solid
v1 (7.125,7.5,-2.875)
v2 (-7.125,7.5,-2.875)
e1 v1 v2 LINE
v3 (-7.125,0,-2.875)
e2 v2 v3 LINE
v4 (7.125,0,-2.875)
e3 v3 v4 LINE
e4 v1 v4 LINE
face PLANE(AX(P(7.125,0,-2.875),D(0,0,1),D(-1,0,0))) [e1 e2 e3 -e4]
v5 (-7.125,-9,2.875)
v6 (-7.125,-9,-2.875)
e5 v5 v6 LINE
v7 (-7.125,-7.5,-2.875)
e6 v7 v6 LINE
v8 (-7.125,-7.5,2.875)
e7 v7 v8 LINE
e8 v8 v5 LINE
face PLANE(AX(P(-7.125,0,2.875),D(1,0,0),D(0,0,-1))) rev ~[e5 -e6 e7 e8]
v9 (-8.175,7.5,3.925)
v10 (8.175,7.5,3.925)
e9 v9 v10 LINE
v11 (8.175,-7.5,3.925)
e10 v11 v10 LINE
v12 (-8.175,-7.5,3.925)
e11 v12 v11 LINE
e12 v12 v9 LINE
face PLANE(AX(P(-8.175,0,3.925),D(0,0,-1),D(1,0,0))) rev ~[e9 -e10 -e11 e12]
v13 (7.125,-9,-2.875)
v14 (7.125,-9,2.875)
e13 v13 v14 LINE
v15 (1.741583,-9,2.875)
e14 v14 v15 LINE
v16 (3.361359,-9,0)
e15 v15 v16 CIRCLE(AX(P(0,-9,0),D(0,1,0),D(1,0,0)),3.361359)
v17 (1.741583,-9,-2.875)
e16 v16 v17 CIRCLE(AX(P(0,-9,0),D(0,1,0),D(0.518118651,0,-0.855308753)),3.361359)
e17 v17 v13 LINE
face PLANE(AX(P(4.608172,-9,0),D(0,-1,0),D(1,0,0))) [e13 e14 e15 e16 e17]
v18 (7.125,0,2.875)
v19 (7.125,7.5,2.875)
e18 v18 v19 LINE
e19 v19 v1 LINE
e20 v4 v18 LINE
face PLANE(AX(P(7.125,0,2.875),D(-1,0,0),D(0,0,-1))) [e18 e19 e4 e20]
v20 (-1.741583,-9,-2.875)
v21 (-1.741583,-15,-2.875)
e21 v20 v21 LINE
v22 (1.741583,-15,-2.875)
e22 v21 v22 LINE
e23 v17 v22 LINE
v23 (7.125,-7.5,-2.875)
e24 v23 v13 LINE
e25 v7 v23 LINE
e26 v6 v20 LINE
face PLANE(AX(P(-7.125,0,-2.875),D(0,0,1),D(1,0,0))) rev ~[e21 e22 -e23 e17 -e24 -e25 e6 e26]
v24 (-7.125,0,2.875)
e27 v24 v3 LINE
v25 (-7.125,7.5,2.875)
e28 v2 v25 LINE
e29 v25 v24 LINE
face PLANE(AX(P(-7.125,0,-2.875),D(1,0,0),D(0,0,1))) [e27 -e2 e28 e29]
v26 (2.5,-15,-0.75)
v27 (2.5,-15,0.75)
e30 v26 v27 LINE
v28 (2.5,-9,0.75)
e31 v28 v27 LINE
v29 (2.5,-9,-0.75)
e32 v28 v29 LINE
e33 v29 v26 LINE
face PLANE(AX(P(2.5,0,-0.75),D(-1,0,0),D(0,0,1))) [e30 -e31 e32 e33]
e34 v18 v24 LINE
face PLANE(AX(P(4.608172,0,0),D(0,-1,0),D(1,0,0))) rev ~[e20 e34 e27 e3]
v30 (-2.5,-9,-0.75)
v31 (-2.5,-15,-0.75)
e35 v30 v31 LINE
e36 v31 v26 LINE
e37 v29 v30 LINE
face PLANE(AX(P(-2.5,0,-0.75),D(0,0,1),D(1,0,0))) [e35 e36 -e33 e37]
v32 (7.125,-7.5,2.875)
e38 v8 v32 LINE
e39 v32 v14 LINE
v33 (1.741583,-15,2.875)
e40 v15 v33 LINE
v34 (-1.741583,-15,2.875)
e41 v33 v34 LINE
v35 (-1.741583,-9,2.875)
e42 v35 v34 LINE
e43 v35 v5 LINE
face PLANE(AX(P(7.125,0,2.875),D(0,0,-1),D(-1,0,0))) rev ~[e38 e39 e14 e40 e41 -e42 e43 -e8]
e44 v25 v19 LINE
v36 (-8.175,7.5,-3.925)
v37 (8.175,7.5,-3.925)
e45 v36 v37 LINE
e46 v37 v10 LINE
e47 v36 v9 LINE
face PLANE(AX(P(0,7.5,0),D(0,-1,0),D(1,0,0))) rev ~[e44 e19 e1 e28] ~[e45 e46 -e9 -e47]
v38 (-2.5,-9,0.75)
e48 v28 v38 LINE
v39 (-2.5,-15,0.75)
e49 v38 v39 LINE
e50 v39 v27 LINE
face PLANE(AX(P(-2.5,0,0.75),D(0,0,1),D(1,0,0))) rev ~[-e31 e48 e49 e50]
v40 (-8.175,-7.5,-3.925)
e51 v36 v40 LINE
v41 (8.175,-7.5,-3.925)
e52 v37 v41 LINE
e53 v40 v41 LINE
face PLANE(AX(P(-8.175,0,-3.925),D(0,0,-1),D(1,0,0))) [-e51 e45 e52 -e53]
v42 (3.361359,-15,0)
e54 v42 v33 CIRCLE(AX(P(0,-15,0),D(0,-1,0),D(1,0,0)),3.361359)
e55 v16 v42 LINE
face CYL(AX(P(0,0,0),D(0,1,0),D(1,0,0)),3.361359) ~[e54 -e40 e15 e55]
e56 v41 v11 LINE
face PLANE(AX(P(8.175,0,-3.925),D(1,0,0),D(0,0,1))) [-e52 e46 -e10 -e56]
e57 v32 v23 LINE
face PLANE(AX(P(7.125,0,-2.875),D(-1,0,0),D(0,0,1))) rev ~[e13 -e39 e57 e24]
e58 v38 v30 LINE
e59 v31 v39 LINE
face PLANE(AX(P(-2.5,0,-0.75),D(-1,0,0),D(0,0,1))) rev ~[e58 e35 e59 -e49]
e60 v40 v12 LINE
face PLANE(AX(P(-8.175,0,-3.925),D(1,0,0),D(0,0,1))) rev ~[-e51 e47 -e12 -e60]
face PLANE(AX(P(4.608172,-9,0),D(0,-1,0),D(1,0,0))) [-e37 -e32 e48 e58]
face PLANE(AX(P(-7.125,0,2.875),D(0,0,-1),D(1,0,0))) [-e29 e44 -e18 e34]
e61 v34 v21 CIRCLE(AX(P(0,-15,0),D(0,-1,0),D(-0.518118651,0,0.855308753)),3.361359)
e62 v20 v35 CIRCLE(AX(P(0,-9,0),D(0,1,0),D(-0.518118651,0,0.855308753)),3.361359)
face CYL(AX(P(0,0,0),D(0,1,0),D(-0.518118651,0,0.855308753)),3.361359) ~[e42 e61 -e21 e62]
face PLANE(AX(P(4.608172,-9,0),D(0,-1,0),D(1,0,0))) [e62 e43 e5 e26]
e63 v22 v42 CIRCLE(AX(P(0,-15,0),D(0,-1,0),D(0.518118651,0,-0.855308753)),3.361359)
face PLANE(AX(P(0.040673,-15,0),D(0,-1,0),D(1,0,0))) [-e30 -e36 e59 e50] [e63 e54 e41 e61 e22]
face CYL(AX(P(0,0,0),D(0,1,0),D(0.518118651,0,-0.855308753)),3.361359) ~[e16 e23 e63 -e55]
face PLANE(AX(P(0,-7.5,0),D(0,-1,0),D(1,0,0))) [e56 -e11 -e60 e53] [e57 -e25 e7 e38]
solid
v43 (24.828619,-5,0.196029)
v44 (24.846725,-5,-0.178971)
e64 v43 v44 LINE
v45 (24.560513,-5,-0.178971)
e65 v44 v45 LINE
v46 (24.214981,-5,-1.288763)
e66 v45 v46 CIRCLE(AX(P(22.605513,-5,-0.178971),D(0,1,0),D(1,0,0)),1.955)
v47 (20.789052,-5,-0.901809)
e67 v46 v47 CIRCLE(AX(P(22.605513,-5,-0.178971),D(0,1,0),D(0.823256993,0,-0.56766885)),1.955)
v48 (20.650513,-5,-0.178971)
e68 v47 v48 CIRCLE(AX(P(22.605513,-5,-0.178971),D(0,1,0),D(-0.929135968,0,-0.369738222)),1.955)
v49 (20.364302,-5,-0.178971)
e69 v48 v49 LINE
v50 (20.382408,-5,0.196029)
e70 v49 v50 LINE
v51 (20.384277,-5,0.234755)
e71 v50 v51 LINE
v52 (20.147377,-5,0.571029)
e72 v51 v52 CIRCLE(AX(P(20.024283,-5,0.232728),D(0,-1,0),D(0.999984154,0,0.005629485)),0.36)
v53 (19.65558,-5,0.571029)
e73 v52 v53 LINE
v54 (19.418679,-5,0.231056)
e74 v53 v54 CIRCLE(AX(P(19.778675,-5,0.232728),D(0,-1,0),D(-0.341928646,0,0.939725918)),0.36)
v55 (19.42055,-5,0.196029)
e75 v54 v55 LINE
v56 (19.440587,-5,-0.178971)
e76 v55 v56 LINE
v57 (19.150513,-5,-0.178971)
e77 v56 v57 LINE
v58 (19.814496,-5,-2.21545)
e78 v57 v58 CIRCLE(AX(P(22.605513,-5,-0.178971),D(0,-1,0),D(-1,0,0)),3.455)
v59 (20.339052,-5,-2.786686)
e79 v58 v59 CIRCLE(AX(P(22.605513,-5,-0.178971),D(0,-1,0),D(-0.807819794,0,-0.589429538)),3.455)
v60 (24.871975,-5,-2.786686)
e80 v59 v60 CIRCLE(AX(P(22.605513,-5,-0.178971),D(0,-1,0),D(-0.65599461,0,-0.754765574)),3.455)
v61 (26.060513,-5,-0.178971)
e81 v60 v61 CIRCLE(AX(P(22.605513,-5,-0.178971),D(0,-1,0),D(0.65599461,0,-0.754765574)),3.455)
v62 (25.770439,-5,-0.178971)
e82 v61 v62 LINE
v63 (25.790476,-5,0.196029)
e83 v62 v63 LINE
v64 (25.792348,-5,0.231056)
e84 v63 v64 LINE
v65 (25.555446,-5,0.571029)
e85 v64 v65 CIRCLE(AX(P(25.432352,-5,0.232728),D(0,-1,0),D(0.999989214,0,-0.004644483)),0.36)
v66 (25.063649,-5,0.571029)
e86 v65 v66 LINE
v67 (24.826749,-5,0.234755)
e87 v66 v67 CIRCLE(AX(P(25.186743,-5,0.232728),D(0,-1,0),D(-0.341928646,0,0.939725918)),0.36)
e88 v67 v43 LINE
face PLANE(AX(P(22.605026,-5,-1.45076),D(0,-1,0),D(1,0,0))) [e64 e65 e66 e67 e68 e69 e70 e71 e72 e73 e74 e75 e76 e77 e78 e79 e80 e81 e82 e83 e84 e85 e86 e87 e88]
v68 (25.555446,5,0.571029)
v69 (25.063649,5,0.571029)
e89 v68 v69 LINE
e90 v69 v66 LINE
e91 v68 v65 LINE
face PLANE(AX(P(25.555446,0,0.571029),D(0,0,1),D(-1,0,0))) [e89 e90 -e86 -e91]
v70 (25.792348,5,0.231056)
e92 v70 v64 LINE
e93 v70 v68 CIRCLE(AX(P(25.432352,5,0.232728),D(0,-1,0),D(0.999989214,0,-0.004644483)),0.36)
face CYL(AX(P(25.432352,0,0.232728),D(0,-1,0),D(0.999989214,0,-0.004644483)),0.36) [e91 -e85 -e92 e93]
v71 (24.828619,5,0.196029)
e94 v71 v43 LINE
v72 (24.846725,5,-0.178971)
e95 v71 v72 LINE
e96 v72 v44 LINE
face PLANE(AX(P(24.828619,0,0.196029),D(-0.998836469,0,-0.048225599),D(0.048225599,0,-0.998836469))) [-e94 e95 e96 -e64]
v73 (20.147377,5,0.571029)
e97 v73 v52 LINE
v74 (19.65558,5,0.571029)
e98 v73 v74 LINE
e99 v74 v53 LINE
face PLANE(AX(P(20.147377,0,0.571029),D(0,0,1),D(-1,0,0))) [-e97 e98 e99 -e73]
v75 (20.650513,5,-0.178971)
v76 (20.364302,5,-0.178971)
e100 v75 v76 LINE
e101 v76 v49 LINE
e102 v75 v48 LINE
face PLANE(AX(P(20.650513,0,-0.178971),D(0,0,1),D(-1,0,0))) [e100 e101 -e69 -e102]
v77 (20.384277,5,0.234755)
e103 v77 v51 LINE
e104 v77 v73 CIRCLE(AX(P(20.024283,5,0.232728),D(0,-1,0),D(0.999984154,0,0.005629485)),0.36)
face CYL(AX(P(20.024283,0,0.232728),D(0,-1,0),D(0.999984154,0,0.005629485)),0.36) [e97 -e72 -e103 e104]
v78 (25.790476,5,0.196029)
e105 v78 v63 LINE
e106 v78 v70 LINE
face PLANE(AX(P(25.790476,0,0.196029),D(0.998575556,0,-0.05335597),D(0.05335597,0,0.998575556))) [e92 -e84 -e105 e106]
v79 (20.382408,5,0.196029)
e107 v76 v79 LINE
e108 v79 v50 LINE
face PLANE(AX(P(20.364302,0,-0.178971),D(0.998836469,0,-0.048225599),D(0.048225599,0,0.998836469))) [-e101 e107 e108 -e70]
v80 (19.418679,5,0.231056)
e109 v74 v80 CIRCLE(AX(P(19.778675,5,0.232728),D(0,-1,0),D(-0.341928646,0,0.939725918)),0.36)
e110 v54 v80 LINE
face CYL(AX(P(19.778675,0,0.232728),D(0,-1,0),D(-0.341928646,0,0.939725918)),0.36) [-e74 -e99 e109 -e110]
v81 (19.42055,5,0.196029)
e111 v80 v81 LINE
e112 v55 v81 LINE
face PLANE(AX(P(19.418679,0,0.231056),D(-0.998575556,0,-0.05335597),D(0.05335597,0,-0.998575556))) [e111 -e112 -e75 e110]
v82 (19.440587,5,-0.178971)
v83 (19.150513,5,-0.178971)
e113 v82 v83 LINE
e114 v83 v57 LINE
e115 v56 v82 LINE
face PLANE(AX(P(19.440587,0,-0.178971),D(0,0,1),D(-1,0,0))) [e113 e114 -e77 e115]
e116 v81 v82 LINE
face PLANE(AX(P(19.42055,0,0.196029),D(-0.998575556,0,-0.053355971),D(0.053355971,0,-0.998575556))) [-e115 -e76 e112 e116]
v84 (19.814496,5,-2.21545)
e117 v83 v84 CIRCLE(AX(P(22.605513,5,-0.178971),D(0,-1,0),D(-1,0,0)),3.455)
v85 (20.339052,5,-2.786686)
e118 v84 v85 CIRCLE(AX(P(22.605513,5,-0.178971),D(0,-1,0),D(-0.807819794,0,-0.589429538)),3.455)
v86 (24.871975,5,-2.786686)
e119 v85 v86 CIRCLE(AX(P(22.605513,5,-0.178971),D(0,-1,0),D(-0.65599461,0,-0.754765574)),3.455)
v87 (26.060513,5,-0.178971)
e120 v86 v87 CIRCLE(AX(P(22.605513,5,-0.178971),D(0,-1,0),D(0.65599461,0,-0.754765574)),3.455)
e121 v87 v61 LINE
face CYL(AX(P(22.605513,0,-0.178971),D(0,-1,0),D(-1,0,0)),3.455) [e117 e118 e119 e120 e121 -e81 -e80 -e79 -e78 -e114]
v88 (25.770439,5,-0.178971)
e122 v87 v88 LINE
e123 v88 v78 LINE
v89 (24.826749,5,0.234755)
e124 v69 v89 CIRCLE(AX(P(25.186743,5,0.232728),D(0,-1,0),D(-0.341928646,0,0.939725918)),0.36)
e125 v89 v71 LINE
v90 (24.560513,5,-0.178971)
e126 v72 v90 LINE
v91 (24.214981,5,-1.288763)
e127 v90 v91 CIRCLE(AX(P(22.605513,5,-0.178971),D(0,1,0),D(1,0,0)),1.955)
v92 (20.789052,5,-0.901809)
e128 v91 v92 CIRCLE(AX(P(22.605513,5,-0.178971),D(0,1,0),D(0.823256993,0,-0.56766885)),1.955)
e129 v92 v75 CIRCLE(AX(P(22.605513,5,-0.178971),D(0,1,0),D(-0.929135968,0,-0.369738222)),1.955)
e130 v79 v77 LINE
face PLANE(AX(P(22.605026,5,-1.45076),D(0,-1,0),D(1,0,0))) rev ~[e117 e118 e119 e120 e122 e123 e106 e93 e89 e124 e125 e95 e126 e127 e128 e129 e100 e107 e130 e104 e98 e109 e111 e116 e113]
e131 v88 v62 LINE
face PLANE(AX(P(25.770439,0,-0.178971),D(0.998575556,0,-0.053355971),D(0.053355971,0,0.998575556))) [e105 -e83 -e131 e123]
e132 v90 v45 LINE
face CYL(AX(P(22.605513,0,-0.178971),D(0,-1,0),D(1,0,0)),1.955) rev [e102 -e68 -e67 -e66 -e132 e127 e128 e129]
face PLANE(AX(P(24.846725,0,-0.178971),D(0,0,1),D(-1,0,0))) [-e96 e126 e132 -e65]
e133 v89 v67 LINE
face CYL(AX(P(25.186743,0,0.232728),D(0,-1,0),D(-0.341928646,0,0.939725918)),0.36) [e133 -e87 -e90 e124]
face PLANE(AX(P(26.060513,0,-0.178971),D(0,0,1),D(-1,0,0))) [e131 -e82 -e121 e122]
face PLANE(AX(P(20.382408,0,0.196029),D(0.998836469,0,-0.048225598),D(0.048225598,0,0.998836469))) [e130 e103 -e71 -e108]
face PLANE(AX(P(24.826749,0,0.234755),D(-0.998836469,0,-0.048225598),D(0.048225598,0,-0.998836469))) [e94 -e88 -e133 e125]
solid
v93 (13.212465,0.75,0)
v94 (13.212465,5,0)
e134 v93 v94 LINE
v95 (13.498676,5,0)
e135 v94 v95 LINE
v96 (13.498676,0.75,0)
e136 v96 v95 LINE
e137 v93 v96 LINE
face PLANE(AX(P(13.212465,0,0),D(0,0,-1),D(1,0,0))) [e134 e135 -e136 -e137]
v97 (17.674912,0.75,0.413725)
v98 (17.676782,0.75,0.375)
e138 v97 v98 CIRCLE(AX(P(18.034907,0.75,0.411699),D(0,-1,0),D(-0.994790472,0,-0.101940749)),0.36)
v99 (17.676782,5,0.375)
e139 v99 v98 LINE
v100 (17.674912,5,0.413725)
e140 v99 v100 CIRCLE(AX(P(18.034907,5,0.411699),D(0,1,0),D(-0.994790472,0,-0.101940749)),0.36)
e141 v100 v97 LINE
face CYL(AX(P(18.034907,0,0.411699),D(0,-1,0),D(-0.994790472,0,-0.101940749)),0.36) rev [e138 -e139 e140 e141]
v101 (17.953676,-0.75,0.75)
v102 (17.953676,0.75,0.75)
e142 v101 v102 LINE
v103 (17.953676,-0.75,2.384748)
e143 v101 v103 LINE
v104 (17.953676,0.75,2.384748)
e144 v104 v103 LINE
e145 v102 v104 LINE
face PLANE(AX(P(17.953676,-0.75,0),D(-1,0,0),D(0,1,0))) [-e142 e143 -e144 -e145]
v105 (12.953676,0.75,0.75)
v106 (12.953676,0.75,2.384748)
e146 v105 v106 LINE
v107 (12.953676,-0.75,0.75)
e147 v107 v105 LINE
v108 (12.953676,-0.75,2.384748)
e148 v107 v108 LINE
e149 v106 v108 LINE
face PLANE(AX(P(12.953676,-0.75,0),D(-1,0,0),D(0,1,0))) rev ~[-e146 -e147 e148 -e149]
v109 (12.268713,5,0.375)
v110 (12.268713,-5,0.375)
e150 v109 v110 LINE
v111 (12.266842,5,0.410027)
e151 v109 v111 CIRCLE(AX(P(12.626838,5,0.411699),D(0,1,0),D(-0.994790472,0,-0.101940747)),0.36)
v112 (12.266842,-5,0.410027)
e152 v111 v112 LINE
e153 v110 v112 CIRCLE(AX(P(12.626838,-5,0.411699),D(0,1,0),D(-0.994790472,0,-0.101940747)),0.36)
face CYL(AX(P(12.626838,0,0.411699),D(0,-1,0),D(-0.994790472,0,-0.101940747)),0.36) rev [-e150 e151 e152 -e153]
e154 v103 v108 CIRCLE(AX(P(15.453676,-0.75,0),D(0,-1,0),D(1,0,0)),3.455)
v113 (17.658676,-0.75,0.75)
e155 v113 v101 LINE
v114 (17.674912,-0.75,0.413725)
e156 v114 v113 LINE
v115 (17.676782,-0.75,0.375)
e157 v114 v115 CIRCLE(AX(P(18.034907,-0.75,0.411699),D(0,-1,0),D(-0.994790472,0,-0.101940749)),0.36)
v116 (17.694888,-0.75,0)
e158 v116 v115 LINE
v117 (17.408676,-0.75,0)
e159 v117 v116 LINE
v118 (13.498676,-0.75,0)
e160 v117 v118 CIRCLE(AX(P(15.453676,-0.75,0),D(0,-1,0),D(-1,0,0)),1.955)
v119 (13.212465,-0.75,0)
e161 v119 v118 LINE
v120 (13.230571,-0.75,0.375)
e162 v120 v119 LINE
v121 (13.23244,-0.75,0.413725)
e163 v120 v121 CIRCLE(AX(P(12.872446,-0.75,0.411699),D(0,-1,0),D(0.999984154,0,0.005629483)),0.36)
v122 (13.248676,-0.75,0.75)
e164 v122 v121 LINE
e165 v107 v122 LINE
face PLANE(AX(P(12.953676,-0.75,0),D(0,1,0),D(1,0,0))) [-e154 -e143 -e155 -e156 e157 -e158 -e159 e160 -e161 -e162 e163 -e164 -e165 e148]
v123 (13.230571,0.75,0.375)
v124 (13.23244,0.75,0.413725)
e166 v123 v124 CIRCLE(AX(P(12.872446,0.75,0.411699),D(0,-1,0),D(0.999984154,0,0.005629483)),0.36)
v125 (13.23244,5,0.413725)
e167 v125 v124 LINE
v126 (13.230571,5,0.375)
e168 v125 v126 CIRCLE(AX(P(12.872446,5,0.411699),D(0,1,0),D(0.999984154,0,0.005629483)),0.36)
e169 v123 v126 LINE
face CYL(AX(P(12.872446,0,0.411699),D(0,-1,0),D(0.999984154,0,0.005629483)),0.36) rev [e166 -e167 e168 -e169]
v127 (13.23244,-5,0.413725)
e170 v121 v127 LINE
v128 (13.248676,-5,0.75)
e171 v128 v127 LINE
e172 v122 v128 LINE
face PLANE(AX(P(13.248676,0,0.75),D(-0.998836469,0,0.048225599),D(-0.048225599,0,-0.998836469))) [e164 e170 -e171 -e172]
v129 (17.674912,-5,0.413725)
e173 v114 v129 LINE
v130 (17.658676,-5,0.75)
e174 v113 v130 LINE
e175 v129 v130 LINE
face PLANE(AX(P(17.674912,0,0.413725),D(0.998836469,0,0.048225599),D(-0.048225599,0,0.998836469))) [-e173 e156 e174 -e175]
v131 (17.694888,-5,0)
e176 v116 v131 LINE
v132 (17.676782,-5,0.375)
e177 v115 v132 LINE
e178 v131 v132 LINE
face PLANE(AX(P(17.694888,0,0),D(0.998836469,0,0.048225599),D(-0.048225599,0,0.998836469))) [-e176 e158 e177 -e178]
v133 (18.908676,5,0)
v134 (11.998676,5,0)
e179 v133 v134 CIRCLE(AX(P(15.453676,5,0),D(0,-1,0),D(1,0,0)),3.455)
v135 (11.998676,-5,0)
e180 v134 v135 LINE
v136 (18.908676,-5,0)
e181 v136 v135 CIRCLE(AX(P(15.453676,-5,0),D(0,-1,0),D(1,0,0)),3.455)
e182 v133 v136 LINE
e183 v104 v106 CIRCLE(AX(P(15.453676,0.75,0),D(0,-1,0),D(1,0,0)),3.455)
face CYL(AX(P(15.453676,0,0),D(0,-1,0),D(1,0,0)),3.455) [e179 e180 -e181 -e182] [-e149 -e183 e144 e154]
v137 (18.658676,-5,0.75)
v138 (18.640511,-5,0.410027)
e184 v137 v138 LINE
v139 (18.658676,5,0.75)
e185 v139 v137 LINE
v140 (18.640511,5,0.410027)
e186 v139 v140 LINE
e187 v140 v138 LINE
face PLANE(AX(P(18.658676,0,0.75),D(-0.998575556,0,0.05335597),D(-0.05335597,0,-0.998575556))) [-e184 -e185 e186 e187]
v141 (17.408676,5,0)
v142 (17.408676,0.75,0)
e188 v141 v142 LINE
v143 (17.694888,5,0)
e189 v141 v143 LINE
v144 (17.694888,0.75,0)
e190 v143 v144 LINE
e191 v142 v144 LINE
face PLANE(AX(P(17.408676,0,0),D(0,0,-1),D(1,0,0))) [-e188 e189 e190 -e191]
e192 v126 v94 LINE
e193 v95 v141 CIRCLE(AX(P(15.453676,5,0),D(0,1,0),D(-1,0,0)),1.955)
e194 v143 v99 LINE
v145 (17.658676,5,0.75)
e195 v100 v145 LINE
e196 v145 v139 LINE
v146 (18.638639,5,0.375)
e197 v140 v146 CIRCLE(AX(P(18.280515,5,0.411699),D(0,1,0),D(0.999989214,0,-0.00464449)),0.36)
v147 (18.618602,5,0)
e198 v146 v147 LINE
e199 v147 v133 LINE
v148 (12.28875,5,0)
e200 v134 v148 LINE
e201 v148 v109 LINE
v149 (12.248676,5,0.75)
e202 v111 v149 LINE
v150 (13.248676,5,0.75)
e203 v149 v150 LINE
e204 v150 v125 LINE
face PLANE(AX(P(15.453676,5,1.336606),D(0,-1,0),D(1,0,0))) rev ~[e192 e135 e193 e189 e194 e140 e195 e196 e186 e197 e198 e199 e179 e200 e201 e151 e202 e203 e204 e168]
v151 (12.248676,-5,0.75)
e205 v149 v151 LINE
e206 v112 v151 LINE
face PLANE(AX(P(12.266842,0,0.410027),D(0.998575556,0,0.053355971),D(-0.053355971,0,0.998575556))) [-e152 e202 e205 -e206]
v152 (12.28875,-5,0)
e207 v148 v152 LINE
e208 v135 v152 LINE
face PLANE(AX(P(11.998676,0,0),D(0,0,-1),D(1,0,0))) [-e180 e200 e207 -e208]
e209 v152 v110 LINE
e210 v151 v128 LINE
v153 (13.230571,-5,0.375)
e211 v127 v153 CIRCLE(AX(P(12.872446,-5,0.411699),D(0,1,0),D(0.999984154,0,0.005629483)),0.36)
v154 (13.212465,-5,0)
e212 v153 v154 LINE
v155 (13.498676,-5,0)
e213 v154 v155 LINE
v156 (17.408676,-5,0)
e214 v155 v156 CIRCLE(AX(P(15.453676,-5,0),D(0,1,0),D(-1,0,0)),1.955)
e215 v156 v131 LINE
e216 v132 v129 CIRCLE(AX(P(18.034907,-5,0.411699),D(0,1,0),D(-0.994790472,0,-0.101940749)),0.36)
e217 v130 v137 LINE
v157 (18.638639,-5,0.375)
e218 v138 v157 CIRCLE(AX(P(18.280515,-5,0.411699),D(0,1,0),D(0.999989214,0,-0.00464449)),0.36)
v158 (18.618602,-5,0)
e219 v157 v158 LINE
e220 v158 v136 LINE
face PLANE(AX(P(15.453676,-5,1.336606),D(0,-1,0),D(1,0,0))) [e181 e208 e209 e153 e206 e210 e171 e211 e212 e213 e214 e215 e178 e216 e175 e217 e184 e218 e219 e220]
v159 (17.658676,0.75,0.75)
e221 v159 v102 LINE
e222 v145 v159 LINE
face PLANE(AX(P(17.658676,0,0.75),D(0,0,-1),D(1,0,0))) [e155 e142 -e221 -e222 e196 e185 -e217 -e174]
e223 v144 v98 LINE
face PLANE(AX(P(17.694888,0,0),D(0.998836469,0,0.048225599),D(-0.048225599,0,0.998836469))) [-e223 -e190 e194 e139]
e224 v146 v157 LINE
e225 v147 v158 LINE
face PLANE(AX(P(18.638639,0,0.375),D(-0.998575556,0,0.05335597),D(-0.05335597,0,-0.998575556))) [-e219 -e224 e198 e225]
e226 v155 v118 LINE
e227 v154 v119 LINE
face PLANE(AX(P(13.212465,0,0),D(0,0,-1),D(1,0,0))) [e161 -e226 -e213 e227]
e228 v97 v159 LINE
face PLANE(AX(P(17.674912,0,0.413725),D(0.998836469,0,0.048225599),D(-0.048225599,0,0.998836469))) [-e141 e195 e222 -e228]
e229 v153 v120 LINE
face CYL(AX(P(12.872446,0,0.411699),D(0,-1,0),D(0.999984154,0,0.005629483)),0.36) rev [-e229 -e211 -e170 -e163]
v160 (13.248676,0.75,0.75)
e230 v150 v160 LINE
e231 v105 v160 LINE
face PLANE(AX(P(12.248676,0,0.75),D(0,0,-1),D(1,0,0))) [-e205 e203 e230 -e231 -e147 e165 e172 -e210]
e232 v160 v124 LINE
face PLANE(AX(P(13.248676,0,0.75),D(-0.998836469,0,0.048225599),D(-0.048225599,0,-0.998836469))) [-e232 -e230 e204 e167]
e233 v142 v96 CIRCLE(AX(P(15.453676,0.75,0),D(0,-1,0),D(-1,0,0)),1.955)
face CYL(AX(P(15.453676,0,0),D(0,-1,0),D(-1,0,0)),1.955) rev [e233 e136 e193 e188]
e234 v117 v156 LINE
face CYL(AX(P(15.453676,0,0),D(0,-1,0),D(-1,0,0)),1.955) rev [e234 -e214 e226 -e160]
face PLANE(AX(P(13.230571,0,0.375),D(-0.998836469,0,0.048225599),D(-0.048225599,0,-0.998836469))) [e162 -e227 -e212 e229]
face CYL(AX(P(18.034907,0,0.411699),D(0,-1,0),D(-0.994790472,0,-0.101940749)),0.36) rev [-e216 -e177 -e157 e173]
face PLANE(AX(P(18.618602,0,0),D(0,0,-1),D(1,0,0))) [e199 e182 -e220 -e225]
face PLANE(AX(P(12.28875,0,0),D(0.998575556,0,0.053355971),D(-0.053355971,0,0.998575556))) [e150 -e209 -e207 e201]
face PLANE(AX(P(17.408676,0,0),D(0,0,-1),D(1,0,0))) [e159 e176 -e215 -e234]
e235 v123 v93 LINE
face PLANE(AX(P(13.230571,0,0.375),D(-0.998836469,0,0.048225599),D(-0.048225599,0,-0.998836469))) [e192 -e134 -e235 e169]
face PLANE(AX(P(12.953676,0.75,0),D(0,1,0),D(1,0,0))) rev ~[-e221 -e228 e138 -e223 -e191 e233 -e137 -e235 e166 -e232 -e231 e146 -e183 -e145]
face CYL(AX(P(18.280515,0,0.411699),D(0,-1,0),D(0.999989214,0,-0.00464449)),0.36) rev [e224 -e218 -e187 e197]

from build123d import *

# Parameters (mm, degrees)
F0_W     = 16.35
F0_H     = 7.85
F1_DEPTH = 7.5
F0_W_2   = 5
F0_H_2   = 1.5
F2_DEPTH = 9
F3_DEPTH = 15
F4_DEPTH = 5
F5_W     = 5
F5_H     = 1.5
F6_DEPTH = 9.752


with BuildPart() as f1:
    # F0 (on Front) → F1 (new body, symmetric)
    with BuildSketch(Plane.XZ):
        Rectangle(F0_W, F0_H)
        with BuildLine():
            Line((1.7415829263, 2.875), (7.125, 2.875))
            Line((7.125, 2.875), (7.125, -2.875))
            Line((7.125, -2.875), (1.7415829263, -2.875))
            ThreePointArc((1.7415829263, -2.875), (0, -3.3613592622), (-1.7415829263, -2.875))
            Line((-1.7415829263, -2.875), (-7.125, -2.875))
            Line((-7.125, -2.875), (-7.125, 2.875))
            Line((-7.125, 2.875), (-1.7415829263, 2.875))
            ThreePointArc((-1.7415829263, 2.875), (0, 3.3613592622), (1.7415829263, 2.875))
        make_face(mode=Mode.SUBTRACT)
        with BuildLine():
            ThreePointArc((-1.7415829263, -2.875), (0, -3.3613592622), (1.7415829263, -2.875))
            Line((1.7415829263, -2.875), (-1.7415829263, -2.875))
        make_face()
        with BuildLine():
            Line((-1.7415829263, 2.875), (1.7415829263, 2.875))
            ThreePointArc((1.7415829263, 2.875), (0, 3.3613592622), (-1.7415829263, 2.875))
        make_face()
    extrude(amount=F1_DEPTH, both=True)

    # F0 (on Front) → F2 (join)
    with BuildSketch(Plane.XZ):
        with BuildLine():
            Line((7.125, -2.875), (7.125, 2.875))
            Line((7.125, 2.875), (1.7415829263, 2.875))
            ThreePointArc((1.7415829263, 2.875), (2.928551006, 1.6499469975), (3.3613592622, 0))
            ThreePointArc((3.3613592622, 0), (2.928551006, -1.6499469975), (1.7415829263, -2.875))
            Line((1.7415829263, -2.875), (7.125, -2.875))
        make_face()
        with BuildLine():
            ThreePointArc((3.3613592622, 0), (2.928551006, 1.6499469975), (1.7415829263, 2.875))
            Line((1.7415829263, 2.875), (-1.7415829263, 2.875))
            ThreePointArc((-1.7415829263, 2.875), (-3.3613592622, 0), (-1.7415829263, -2.875))
            Line((-1.7415829263, -2.875), (1.7415829263, -2.875))
            ThreePointArc((1.7415829263, -2.875), (2.928551006, -1.6499469975), (3.3613592622, 0))
        make_face()
        Rectangle(F0_W_2, F0_H_2, mode=Mode.SUBTRACT)
        with BuildLine():
            ThreePointArc((-1.7415829263, -2.875), (-3.3613592622, 0), (-1.7415829263, 2.875))
            Line((-1.7415829263, 2.875), (-7.125, 2.875))
            Line((-7.125, 2.875), (-7.125, -2.875))
            Line((-7.125, -2.875), (-1.7415829263, -2.875))
        make_face()
        Rectangle(F0_W_2, F0_H_2)
    extrude(amount=F2_DEPTH)

    # F0 (on Front) → F3 (join)
    with BuildSketch(Plane.XZ):
        with BuildLine():
            ThreePointArc((3.3613592622, 0), (2.928551006, 1.6499469975), (1.7415829263, 2.875))
            Line((1.7415829263, 2.875), (-1.7415829263, 2.875))
            ThreePointArc((-1.7415829263, 2.875), (-3.3613592622, 0), (-1.7415829263, -2.875))
            Line((-1.7415829263, -2.875), (1.7415829263, -2.875))
            ThreePointArc((1.7415829263, -2.875), (2.928551006, -1.6499469975), (3.3613592622, 0))
        make_face()
        Rectangle(F0_W_2, F0_H_2, mode=Mode.SUBTRACT)
    extrude(amount=F3_DEPTH)


with BuildPart() as f4:
    # F0 (on Front) → F4 (new body, symmetric)
    with BuildSketch(Plane.XZ):
        with BuildLine():
            ThreePointArc((13.4986763668, 0), (15.4536763668, 1.955), (17.4086763668, 0))
            Line((17.4086763668, 0), (17.6948876991, 0))
            Line((17.6948876991, 0), (17.676782033, 0.375))
            ThreePointArc((17.676782033, 0.375), (17.6753254742, 0.3943374538), (17.6749123074, 0.4137252844))
            Line((17.6749123074, 0.4137252844), (17.6586763668, 0.75))
            Line((17.6586763668, 0.75), (18.6586763668, 0.75))
            Line((18.6586763668, 0.75), (18.6405108834, 0.4100266558))
            ThreePointArc((18.6405108834, 0.4100266558), (18.6400019662, 0.3924905201), (18.6386393362, 0.375))
            Line((18.6386393362, 0.375), (18.6186023057, 0))
            Line((18.6186023057, 0), (18.9086763668, 0))
            ThreePointArc((18.9086763668, 0), (15.4536763668, 3.455), (11.9986763668, 0))
            Line((11.9986763668, 0), (12.288750428, 0))
            Line((12.288750428, 0), (12.2687133974, 0.375))
            ThreePointArc((12.2687133974, 0.375), (12.2673507674, 0.3924905201), (12.2668418503, 0.4100266558))
            Line((12.2668418503, 0.4100266558), (12.2486763668, 0.75))
            Line((12.2486763668, 0.75), (13.2486763668, 0.75))
            Line((13.2486763668, 0.75), (13.2324404262, 0.4137252844))
            ThreePointArc((13.2324404262, 0.4137252844), (13.2320272594, 0.3943374538), (13.2305707006, 0.375))
            Line((13.2305707006, 0.375), (13.2124650345, 0))
            Line((13.2124650345, 0), (13.4986763668, 0))
        make_face()
    extrude(amount=F4_DEPTH, both=True)

    # F5 (on Top) → F6 (cut)
    with BuildSketch(Plane.XY):
        with Locations((15.4536763668, 0)):
            Rectangle(F5_W, F5_H)
    extrude(amount=F6_DEPTH, mode=Mode.SUBTRACT)


with BuildPart() as f4b:
    # F0 (on Front) → F4, piece 2 (new body, symmetric)
    with BuildSketch(Plane.XZ):
        with BuildLine():
            Line((19.440587234, -0.1789705101), (19.1505131729, -0.1789705101))
            ThreePointArc((19.1505131729, -0.1789705101), (19.3207003873, -1.2499653577), (19.8144957857, -2.2154495658))
            ThreePointArc((19.8144957857, -2.2154495658), (20.0606948092, -2.5158326147), (20.3390517964, -2.7866855691))
            ThreePointArc((20.3390517964, -2.7866855691), (22.6055131729, -3.6339705101), (24.8719745493, -2.7866855691))
            ThreePointArc((24.8719745493, -2.7866855691), (25.7493682153, -1.6118698339), (26.0605131729, -0.1789705101))
            Line((26.0605131729, -0.1789705101), (25.7704391117, -0.1789705101))
            Line((25.7704391117, -0.1789705101), (25.7904761423, 0.1960294899))
            Line((25.7904761423, 0.1960294899), (25.7923476894, 0.2310561457))
            ThreePointArc((25.7923476894, 0.2310561457), (25.7277150085, 0.4385446809), (25.5554458847, 0.5710294899))
            Line((25.5554458847, 0.5710294899), (25.0636490966, 0.5710294899))
            ThreePointArc((25.0636490966, 0.5710294899), (24.8924411463, 0.4400592427), (24.8267491135, 0.2347547743))
            Line((24.8267491135, 0.2347547743), (24.828618839, 0.1960294899))
            Line((24.828618839, 0.1960294899), (24.8467245052, -0.1789705101))
            Line((24.8467245052, -0.1789705101), (24.5605131729, -0.1789705101))
            ThreePointArc((24.5605131729, -0.1789705101), (24.4721322835, -0.7601401032), (24.2149805939, -1.2887631126))
            ThreePointArc((24.2149805939, -1.2887631126), (22.3860935077, -2.1216181906), (20.789052355, -0.9018087335))
            ThreePointArc((20.789052355, -0.9018087335), (20.6854603222, -0.5469678614), (20.6505131729, -0.1789705101))
            Line((20.6505131729, -0.1789705101), (20.3643018405, -0.1789705101))
            Line((20.3643018405, -0.1789705101), (20.3824075067, 0.1960294899))
            Line((20.3824075067, 0.1960294899), (20.3842772322, 0.2347547743))
            ThreePointArc((20.3842772322, 0.2347547743), (20.3185851995, 0.4400592427), (20.1473772491, 0.5710294899))
            Line((20.1473772491, 0.5710294899), (19.655580461, 0.5710294899))
            ThreePointArc((19.655580461, 0.5710294899), (19.4833113372, 0.4385446809), (19.4186786563, 0.2310561457))
            Line((19.4186786563, 0.2310561457), (19.4205502034, 0.1960294899))
            Line((19.4205502034, 0.1960294899), (19.440587234, -0.1789705101))
        make_face()
    extrude(amount=F4_DEPTH, both=True)


solid = Compound([f1.part, f4.part, f4b.part])
